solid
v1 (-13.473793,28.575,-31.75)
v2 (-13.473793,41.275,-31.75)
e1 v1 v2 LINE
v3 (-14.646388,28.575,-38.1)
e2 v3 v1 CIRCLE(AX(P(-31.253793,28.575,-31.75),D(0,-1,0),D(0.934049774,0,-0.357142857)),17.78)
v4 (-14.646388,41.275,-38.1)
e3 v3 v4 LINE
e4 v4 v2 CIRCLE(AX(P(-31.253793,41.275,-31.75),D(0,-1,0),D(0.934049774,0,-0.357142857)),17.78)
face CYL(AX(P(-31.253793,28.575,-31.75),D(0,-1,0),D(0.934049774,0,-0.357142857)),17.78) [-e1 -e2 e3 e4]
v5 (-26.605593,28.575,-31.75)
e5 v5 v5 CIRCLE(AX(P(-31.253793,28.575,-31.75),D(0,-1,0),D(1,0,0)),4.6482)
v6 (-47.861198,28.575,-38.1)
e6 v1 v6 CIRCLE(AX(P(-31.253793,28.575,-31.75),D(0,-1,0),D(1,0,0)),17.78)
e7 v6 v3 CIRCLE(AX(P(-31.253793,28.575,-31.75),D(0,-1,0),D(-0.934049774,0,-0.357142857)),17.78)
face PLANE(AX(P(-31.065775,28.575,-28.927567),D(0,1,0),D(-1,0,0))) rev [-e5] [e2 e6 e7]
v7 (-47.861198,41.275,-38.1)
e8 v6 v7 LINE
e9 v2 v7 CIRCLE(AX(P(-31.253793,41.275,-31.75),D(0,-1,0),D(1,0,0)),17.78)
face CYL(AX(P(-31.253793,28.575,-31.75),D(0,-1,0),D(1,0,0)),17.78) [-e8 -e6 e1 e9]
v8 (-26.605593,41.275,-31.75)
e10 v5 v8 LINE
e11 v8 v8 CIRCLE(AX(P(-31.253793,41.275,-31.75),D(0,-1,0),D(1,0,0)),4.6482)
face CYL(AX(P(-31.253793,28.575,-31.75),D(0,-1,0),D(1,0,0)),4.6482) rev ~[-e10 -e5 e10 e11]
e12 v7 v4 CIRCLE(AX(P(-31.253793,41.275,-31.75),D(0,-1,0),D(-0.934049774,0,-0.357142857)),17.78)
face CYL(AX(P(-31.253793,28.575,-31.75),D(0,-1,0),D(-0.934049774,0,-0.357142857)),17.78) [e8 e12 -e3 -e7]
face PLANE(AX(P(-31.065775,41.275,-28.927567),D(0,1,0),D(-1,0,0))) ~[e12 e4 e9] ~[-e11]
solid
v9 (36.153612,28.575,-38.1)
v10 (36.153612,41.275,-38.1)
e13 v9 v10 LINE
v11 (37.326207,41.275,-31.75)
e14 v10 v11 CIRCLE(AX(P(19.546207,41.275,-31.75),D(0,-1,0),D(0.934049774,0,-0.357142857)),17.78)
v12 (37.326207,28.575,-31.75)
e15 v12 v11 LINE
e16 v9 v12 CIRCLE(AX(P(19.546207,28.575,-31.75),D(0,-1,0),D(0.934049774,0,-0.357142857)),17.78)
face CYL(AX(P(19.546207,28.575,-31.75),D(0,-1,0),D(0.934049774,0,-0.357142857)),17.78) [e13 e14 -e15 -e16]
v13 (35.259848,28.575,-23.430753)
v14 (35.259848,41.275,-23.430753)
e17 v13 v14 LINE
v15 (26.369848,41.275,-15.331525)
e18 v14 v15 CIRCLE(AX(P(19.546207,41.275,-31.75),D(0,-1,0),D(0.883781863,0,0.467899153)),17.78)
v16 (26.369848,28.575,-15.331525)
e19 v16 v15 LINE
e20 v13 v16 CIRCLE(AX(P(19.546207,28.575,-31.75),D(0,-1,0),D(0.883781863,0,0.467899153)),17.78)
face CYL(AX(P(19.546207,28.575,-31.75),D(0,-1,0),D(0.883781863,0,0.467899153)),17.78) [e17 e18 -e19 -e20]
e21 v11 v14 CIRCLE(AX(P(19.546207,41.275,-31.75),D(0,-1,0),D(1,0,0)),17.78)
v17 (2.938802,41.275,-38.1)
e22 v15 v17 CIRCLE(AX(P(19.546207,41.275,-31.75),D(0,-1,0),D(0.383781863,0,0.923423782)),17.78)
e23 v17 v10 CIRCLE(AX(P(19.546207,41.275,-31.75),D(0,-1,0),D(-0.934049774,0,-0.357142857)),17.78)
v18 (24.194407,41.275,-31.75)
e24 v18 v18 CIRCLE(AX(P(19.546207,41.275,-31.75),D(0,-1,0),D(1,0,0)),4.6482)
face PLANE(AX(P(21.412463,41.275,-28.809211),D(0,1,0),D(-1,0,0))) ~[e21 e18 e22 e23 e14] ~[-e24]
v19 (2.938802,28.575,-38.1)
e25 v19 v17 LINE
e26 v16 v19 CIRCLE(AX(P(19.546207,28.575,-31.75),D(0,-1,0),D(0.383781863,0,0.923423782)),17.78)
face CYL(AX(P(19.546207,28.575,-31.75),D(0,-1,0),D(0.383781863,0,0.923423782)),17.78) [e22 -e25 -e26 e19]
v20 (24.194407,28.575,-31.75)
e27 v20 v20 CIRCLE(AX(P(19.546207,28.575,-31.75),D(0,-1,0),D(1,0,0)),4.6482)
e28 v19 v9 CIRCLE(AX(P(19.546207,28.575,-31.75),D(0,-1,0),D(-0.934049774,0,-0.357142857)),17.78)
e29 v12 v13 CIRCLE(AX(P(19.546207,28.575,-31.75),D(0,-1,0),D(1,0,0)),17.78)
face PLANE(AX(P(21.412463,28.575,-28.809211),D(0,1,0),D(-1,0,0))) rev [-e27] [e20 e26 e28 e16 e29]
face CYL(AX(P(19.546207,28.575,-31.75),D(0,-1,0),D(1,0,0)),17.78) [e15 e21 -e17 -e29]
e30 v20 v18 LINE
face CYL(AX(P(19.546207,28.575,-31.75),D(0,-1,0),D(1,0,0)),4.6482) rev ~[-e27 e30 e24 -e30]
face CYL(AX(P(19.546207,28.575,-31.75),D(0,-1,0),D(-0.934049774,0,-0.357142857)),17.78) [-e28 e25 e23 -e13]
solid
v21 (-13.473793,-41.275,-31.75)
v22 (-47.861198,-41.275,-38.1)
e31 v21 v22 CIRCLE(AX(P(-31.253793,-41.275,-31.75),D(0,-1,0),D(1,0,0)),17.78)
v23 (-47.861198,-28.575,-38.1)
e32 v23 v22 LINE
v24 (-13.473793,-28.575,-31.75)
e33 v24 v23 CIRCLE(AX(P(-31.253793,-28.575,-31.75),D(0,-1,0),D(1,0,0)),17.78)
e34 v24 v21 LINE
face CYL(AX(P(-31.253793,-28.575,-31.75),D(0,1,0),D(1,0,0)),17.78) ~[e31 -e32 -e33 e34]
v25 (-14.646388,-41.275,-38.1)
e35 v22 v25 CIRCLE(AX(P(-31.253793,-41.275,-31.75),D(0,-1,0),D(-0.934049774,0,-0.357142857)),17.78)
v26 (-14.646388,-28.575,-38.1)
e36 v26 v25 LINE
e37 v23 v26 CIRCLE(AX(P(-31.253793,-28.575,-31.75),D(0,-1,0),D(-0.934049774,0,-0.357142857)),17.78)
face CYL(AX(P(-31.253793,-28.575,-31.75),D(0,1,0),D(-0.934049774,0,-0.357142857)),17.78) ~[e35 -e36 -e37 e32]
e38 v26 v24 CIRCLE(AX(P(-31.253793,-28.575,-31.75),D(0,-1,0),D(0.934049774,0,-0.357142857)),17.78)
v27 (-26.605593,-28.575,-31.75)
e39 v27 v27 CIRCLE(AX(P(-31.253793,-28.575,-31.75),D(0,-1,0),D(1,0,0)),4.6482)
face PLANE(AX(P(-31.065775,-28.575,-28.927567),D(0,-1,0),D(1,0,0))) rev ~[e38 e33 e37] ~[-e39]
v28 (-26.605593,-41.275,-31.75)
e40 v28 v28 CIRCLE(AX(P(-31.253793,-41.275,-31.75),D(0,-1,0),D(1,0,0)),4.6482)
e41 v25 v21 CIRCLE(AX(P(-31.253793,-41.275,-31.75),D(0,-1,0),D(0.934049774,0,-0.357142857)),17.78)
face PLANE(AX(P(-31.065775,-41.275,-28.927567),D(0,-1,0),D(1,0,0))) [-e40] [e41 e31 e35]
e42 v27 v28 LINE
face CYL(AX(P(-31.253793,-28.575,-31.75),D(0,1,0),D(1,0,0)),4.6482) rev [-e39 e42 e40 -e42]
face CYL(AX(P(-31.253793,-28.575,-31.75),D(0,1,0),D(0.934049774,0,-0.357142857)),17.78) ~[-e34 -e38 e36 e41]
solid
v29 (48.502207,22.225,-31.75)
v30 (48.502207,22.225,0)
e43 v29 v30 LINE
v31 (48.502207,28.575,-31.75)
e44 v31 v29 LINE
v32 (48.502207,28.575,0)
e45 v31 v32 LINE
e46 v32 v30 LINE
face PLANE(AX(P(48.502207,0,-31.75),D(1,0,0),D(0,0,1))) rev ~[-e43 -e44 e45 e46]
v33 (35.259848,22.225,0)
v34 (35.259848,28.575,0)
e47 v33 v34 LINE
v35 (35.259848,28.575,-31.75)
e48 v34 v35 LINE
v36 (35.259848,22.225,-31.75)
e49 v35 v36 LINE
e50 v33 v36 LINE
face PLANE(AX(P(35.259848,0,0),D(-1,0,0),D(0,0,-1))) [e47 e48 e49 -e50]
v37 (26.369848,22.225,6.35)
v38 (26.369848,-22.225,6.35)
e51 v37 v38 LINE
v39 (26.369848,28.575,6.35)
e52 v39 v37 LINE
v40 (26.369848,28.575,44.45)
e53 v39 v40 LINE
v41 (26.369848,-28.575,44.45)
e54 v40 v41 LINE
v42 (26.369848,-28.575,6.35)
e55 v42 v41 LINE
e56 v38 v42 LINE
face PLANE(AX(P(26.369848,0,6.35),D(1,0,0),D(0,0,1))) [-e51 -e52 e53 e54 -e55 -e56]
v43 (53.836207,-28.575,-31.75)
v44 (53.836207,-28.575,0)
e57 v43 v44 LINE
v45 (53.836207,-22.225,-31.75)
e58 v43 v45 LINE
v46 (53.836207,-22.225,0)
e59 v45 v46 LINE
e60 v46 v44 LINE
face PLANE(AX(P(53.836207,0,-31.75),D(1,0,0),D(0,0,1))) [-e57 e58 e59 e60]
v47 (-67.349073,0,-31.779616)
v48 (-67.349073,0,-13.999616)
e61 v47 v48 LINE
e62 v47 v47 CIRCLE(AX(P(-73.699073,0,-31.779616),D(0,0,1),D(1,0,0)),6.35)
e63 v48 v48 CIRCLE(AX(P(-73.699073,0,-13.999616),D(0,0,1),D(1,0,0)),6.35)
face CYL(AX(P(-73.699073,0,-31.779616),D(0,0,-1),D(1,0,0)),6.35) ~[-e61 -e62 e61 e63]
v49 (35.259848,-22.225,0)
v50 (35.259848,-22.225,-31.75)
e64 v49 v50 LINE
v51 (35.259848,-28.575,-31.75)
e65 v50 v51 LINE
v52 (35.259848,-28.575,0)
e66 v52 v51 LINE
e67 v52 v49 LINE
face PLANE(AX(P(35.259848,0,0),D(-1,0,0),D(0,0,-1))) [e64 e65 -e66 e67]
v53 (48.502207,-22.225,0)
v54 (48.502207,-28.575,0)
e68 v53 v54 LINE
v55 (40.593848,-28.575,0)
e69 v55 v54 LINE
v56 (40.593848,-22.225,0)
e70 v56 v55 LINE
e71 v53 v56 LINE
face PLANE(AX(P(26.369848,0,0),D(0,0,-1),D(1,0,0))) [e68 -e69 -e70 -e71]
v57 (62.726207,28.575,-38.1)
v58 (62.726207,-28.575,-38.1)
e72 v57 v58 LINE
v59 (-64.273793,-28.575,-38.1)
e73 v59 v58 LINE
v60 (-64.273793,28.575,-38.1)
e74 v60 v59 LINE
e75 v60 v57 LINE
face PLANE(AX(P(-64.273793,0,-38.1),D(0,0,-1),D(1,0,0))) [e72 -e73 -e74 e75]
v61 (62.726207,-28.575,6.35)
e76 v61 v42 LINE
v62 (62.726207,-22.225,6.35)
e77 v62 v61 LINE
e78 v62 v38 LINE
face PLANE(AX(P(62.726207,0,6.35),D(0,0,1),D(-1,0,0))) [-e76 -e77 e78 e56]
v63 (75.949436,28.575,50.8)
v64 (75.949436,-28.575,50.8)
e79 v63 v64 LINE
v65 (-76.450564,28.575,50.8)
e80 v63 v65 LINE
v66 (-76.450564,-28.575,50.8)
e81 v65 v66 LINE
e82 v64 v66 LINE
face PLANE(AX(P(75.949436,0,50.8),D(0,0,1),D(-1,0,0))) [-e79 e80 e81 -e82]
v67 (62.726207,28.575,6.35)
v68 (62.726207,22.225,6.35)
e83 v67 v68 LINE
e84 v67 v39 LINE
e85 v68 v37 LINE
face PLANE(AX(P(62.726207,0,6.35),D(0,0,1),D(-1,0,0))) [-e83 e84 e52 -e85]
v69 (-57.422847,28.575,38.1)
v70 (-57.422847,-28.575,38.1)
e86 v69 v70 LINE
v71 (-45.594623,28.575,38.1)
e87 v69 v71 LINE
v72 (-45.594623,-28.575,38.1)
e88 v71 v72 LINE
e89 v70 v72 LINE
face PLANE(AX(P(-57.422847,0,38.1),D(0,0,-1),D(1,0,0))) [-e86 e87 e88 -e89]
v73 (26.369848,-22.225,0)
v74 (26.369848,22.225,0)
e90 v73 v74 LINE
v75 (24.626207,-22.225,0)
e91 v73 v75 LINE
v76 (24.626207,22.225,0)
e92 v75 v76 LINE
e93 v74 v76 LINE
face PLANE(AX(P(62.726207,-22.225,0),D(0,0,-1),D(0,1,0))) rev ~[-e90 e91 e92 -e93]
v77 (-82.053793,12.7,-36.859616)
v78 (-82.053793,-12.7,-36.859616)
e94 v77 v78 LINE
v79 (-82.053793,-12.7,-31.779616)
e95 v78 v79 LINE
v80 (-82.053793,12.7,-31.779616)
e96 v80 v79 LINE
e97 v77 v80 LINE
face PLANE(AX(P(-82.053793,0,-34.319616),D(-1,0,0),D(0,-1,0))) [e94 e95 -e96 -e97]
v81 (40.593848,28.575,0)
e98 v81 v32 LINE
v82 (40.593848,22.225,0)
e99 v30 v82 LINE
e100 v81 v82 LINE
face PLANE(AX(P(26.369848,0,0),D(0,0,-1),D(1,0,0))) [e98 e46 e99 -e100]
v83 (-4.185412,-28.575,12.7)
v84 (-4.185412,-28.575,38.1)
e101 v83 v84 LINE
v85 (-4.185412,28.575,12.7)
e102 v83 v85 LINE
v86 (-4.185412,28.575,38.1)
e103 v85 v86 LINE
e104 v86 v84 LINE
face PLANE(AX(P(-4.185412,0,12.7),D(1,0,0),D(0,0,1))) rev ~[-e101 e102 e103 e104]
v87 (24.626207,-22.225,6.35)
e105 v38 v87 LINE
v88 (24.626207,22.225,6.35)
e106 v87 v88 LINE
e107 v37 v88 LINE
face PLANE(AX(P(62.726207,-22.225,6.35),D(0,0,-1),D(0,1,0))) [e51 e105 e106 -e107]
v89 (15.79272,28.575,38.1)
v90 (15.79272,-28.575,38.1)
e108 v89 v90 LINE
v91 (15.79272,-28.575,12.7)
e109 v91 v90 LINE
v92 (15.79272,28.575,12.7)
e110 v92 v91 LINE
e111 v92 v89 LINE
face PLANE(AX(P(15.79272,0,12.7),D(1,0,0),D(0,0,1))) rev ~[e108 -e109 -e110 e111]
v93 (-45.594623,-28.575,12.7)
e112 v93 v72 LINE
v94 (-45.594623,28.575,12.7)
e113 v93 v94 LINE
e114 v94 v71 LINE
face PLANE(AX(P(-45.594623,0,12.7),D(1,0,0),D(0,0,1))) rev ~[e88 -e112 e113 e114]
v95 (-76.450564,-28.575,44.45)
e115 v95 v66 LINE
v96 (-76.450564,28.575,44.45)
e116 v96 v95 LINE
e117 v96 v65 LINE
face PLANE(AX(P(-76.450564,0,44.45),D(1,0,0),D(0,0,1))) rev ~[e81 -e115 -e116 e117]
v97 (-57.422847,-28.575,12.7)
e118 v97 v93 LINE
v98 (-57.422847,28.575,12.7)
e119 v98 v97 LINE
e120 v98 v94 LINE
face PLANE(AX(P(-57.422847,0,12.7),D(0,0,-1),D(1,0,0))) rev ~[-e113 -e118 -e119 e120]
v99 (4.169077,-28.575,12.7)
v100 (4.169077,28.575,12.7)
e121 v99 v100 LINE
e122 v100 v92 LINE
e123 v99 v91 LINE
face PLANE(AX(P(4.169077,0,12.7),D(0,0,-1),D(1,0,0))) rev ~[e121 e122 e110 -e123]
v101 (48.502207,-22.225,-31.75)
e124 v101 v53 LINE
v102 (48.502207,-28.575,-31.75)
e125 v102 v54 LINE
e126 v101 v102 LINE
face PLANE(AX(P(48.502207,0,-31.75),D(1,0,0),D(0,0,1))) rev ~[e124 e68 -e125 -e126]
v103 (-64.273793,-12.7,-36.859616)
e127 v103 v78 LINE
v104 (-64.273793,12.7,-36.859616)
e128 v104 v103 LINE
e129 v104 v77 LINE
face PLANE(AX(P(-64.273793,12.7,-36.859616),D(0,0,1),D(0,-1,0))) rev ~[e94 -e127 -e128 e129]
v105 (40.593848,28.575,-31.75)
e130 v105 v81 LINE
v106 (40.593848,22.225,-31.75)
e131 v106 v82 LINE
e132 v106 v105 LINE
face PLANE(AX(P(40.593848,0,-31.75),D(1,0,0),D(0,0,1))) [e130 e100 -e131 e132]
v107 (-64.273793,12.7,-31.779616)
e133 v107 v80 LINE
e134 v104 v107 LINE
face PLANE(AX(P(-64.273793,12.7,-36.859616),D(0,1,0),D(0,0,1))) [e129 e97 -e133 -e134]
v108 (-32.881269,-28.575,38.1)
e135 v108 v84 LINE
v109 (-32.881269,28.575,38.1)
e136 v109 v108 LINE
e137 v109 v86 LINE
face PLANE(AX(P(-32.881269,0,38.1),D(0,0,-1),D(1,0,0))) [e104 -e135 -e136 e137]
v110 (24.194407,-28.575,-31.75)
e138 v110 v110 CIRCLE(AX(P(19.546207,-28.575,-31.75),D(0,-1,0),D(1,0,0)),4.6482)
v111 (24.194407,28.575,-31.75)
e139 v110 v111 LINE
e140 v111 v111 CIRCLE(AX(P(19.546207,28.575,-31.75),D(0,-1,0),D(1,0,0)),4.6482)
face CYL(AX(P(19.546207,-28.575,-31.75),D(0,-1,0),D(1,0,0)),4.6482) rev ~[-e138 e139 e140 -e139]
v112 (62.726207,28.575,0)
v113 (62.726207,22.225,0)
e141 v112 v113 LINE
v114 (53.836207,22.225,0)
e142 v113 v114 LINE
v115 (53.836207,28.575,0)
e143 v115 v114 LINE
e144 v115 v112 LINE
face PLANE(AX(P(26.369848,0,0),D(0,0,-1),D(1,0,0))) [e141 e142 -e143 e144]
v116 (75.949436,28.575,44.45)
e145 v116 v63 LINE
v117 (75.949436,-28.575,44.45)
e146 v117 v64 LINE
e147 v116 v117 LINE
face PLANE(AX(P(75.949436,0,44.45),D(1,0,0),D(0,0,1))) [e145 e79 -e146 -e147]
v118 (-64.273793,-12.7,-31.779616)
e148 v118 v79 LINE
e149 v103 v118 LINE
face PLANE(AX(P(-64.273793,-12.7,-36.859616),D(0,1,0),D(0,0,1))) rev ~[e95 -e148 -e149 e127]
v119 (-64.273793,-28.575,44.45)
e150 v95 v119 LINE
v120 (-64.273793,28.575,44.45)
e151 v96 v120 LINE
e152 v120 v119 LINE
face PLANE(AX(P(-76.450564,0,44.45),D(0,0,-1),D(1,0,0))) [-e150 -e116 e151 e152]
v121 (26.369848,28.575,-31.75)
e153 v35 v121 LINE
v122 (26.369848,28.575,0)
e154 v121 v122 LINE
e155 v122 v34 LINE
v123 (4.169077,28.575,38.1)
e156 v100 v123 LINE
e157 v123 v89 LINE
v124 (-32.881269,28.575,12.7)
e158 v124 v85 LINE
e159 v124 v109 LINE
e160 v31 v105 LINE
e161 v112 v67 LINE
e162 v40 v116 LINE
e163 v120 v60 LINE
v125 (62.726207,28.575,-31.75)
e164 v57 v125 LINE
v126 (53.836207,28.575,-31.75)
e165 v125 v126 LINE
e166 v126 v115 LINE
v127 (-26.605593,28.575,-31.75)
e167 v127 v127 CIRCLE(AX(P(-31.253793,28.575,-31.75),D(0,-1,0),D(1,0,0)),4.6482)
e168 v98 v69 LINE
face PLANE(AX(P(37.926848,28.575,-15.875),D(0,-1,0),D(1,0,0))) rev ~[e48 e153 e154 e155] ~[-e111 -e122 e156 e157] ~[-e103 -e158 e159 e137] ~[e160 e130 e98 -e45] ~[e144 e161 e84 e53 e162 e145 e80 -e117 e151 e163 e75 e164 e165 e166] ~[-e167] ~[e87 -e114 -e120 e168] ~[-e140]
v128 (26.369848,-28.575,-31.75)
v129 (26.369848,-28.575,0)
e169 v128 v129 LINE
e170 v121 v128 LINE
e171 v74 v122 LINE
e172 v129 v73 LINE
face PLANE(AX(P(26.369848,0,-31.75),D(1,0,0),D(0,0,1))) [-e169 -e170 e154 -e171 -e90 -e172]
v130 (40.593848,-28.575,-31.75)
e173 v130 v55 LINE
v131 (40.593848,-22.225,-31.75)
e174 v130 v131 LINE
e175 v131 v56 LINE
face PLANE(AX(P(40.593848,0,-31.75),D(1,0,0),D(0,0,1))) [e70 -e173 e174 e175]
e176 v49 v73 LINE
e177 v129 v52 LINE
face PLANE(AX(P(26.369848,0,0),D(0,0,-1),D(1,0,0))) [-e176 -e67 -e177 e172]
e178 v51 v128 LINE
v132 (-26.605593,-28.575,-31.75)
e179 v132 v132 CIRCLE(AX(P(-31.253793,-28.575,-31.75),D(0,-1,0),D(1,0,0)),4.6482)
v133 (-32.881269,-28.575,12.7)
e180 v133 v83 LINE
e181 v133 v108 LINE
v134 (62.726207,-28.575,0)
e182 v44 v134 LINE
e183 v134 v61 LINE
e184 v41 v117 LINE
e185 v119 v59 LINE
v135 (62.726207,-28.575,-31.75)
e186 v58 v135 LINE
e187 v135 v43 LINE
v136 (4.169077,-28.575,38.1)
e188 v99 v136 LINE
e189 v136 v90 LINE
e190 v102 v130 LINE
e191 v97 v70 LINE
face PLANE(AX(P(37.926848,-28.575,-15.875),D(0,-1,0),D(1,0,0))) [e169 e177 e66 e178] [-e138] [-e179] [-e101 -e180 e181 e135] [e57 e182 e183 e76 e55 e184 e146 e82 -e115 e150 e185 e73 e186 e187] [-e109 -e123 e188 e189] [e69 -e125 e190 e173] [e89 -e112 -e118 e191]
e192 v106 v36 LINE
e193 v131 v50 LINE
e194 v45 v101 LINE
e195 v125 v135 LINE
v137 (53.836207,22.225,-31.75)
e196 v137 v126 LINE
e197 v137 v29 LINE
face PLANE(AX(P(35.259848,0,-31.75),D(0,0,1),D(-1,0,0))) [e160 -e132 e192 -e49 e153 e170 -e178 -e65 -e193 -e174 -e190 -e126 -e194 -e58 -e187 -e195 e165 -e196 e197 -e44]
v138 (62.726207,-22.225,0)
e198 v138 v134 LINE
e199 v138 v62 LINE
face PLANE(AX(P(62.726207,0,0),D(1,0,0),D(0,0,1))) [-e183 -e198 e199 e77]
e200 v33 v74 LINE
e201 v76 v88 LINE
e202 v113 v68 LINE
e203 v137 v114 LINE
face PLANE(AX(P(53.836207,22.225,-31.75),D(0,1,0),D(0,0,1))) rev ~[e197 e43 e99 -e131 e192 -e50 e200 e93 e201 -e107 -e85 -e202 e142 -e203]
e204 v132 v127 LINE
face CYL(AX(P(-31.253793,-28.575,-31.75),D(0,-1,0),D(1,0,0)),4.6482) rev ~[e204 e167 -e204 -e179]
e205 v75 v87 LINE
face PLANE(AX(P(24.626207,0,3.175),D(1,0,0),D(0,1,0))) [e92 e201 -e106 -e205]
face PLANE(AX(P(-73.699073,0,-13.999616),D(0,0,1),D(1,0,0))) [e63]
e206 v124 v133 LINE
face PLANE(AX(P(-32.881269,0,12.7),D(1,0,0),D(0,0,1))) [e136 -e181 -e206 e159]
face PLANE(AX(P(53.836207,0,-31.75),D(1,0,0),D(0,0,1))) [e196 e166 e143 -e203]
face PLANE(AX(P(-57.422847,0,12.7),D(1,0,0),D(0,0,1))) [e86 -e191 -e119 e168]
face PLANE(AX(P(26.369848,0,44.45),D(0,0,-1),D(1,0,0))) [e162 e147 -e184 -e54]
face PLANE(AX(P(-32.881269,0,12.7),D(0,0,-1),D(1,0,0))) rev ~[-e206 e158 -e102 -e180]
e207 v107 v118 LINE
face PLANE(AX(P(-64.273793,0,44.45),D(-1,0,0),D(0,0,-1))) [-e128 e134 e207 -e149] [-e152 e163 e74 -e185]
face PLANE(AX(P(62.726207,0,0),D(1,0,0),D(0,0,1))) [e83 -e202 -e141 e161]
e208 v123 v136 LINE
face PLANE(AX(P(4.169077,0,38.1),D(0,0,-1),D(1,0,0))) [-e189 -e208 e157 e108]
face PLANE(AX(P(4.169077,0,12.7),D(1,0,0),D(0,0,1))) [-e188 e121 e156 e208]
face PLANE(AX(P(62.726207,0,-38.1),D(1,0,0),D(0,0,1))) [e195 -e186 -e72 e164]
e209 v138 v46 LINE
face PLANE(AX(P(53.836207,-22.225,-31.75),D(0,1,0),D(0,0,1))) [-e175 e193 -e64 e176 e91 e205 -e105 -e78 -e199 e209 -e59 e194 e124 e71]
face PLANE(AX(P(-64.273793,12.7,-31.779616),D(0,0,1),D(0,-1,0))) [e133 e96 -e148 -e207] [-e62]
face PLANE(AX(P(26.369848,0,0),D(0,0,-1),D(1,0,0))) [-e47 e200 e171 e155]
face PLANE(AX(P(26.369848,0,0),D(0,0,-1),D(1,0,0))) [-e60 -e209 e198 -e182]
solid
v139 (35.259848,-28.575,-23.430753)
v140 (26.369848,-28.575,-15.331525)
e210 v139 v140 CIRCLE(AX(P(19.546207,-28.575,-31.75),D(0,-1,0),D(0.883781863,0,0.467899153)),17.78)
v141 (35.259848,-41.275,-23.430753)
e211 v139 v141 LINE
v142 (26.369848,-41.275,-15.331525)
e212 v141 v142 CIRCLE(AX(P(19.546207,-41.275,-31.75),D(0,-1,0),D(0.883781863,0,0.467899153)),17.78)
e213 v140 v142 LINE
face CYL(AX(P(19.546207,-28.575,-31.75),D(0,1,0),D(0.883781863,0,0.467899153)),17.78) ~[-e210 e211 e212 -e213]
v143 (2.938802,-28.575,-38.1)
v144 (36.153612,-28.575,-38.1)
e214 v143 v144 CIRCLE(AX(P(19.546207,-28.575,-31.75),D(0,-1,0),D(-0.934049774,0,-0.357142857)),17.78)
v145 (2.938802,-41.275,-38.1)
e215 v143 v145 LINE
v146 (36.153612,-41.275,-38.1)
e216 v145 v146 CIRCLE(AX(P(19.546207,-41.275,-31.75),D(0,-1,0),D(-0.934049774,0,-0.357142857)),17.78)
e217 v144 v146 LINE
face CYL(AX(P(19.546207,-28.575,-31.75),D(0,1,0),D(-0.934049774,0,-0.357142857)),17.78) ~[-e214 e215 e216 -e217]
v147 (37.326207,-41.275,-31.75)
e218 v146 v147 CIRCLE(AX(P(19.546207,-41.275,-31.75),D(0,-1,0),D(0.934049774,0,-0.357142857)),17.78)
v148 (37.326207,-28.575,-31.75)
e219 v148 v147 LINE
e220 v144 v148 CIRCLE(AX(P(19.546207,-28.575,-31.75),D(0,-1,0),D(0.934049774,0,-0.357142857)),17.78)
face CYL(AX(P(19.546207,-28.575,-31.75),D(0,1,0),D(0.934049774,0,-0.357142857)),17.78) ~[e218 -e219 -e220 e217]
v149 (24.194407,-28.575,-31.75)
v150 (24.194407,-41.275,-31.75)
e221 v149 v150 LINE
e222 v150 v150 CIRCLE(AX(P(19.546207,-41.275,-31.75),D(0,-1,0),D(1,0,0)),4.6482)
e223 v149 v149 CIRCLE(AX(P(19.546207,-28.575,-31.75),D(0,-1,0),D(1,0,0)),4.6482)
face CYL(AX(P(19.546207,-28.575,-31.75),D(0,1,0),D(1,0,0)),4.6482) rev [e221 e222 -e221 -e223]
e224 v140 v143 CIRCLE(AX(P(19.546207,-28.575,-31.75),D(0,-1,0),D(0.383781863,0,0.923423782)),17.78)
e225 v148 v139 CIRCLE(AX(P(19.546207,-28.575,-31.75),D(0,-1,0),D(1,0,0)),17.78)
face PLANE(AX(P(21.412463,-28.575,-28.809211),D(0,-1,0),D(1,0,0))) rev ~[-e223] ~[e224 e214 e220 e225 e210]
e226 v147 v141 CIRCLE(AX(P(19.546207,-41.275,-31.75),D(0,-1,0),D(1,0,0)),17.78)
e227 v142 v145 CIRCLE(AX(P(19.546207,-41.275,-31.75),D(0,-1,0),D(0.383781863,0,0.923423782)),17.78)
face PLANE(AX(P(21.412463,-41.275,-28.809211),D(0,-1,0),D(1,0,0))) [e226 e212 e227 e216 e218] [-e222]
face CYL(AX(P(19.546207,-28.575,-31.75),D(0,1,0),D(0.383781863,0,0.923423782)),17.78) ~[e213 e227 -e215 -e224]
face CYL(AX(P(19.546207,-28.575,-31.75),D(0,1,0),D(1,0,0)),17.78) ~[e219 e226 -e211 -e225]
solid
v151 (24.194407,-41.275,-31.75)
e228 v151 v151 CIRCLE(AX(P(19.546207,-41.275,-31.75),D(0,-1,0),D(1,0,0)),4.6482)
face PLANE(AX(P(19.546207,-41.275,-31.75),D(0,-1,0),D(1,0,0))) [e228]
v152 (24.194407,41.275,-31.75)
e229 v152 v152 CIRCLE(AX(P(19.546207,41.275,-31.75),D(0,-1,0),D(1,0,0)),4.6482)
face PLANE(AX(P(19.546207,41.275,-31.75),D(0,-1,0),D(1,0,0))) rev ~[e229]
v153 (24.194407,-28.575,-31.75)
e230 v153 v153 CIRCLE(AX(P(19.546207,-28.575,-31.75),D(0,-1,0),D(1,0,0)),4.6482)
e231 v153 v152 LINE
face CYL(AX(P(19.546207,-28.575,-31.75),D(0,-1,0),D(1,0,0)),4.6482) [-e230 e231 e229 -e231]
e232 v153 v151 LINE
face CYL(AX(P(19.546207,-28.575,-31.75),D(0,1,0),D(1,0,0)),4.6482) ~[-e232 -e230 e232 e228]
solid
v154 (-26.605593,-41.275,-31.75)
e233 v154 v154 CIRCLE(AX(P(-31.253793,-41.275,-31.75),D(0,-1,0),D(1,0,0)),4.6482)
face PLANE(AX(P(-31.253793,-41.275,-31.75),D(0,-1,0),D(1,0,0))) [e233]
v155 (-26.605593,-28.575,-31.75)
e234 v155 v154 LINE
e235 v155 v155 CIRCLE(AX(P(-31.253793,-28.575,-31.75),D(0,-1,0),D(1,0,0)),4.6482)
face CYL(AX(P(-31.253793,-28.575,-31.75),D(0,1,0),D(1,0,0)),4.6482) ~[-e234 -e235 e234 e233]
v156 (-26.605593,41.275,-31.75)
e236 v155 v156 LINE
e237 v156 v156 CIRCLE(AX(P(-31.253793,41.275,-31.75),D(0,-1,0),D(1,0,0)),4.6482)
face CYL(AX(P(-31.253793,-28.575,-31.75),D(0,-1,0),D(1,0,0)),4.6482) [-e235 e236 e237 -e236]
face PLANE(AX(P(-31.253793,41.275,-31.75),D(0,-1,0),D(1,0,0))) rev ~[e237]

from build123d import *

# Parameters (mm, degrees)
F0_W           = 5.334
F0_H           = 31.75
F0_W_2         = 12.1767708808
F0_H_2         = 6.35
F0_W_3         = 13.2232291192
F0_W_4         = 11.8282231389
F0_H_3         = 25.4
F0_W_5         = 28.695857618
F0_W_6         = 11.6236433387
F1_DEPTH       = 28.575
F2_W           = 44.45
F2_H           = 31.75
F3_DEPTH       = 25.4
F4_W           = 44.45
F4_H           = 6.35
F5_DEPTH       = 38.1
F6_R           = 4.6482
F7_DEPTH       = 12.7
F9_DEPTH       = 12.7
F9_DEPTH_BACK  = 70.104
F10_W          = 25.4
F10_H          = 5.08
F11_DEPTH      = 17.78
F12_R          = 6.35
F13_DEPTH      = 17.78
F14_DEPTH      = 69.85
F14_DEPTH_BACK = 12.7


# Not quite as in the source:
# - a feature names something its author has since deleted; it is built from what else it names


with BuildPart() as f1:
    # F0 (on Front) → F1 (new body, symmetric)
    with BuildSketch(Plane.XZ):
        Polygon((40.5938484461, 0), (35.2598484461, 0), (35.2598484461, -20.7330111994), (35.2598484461, -31.75), (40.5938484461, -31.75), (40.5938484461, -22.8515356839), align=None)
        with Locations((51.1692069136, -15.875)):
            Rectangle(F0_W, F0_H)
        with Locations((-70.3621785268, 47.625)):
            Rectangle(F0_W_2, F0_H_2)
        with Locations((69.3378214732, 47.625)):
            Rectangle(F0_W_3, F0_H_2)
        Polygon((62.7262069136, 50.8), (-64.2737930864, 50.8), (-64.2737930864, 44.45), (26.3698484461, 44.45), (62.7262069136, 44.45), align=None)
        Polygon((26.3698484461, 44.45), (-64.2737930864, 44.45), (-64.2737930864, -38.1), (-47.8611980613, -38.1), (-14.6463881115, -38.1), (13.0988019387, -38.1), (26.3698484461, -38.1), (26.3698484461, -31.75), (26.3698484461, -14.7111620115), (26.3698484461, 0), (26.3698484461, 6.35), align=None)
        with Locations((-51.5087349863, 25.4)):
            Rectangle(F0_W_4, F0_H_3, mode=Mode.SUBTRACT)
        with Locations((-18.5333405269, 25.4)):
            Rectangle(F0_W_5, F0_H_3, mode=Mode.SUBTRACT)
        with Locations((9.980898246, 25.4)):
            Rectangle(F0_W_6, F0_H_3, mode=Mode.SUBTRACT)
        Polygon((62.7262069136, 0), (62.7262069136, 6.35), (26.3698484461, 6.35), (26.3698484461, 0), (35.2598484461, 0), (40.5938484461, 0), (48.5022069136, 0), (53.8362069136, 0), align=None)
        Polygon((62.7262069136, -38.1), (62.7262069136, -31.75), (53.8362069136, -31.75), (48.5022069136, -31.75), (47.4862069136, -31.75), (40.5938484461, -31.75), (35.2598484461, -31.75), (26.3698484461, -31.75), (26.3698484461, -38.1), (46.3136118885, -38.1), align=None)
    extrude(amount=F1_DEPTH, both=True)

    # F2 (on face) → F3 (cut)
    with BuildSketch(Plane.YZ.offset(53.8362069136)):
        with Locations((0, -15.875)):
            Rectangle(F2_W, F2_H)
    extrude(amount=-F3_DEPTH, mode=Mode.SUBTRACT)

    # F4 (on face) → F5 (cut)
    with BuildSketch(Plane.YZ.offset(62.7262069136)):
        with Locations((0, 3.175)):
            Rectangle(F4_W, F4_H)
    extrude(amount=-F5_DEPTH, mode=Mode.SUBTRACT)

    # F6 (on face) → F9 (cut, two sides)
    with BuildSketch(Plane.XZ.offset(28.575)) as f9_sk:
        with Locations((19.5462069136, -31.75)):
            Circle(F6_R)
        with Locations((-31.2537930864, -31.75)):
            Circle(F6_R)
    extrude(amount=F9_DEPTH, mode=Mode.SUBTRACT)
    extrude(f9_sk.sketch, amount=-F9_DEPTH_BACK, mode=Mode.SUBTRACT)

    # F10 (on face) → F11 (join)
    with BuildSketch(Plane(origin=(-64.2737930864, 0, 0), x_dir=(0, -1, 0), z_dir=(-1, 0, 0))):
        with Locations((0, -34.3196164)):
            Rectangle(F10_W, F10_H)
    extrude(amount=F11_DEPTH)

    # F12 (on face) → F13 (join)
    with BuildSketch(Plane.XY.offset(-31.7796164)):
        with Locations((-73.6990726864, 0)):
            Circle(F12_R)
    extrude(amount=F13_DEPTH)


with BuildPart() as f7:
    # F6 (on face) → F7 (new body)
    with BuildSketch(Plane.XZ.offset(28.575)):
        with BuildLine():
            ThreePointArc((36.1536118885, -38.1), (37.0306008186, -34.9786792614), (37.3262069136, -31.75))
            ThreePointArc((37.3262069136, -31.75), (36.8018863619, -27.4639847439), (35.2598484461, -23.4307530517))
            Line((35.2598484461, -23.4307530517), (35.2598484461, -31.75))
            Line((35.2598484461, -31.75), (26.3698484461, -31.75))
            Line((26.3698484461, -31.75), (26.3698484461, -15.331525155))
            ThreePointArc((26.3698484461, -15.331525155), (7.1554293566, -18.9986458941), (2.9388019387, -38.1))
            Line((2.9388019387, -38.1), (36.1536118885, -38.1))
        make_face()
        with Locations((19.5462069136, -31.75)):
            Circle(F6_R, mode=Mode.SUBTRACT)
        with BuildLine():
            Line((35.2598484461, -31.75), (35.2598484461, -23.4307530517))
            ThreePointArc((35.2598484461, -23.4307530517), (31.5204148256, -18.6066844031), (26.3698484461, -15.331525155))
            Line((26.3698484461, -15.331525155), (26.3698484461, -31.75))
            Line((26.3698484461, -31.75), (35.2598484461, -31.75))
        make_face()
        with BuildLine():
            ThreePointArc((2.9388019387, -38.1), (19.5462069136, -49.53), (36.1536118885, -38.1))
            Line((36.1536118885, -38.1), (2.9388019387, -38.1))
        make_face()
    extrude(amount=F7_DEPTH)


with BuildPart() as f7b:
    # F6 (on face) → F7, piece 2 (new body)
    with BuildSketch(Plane.XZ.offset(28.575)):
        with BuildLine():
            Line((-47.8611980613, -38.1), (-14.6463881115, -38.1))
            ThreePointArc((-14.6463881115, -38.1), (-13.7693991814, -34.9786792614), (-13.4737930864, -31.75))
            ThreePointArc((-13.4737930864, -31.75), (-34.4824723478, -14.265606095), (-47.8611980613, -38.1))
        make_face()
        with Locations((-31.2537930864, -31.75)):
            Circle(F6_R, mode=Mode.SUBTRACT)
        with BuildLine():
            ThreePointArc((-47.8611980613, -38.1), (-31.2537930864, -49.53), (-14.6463881115, -38.1))
            Line((-14.6463881115, -38.1), (-47.8611980613, -38.1))
        make_face()
    extrude(amount=F7_DEPTH)


with BuildPart() as f8_1:
    # F8: instance of F7
    add(f7.part.mirror(Plane.XZ))


with BuildPart() as f8_2:
    # F8: instance of F7b
    add(f7b.part.mirror(Plane.XZ))


with BuildPart() as f14:
    # F6 (on face) → F14 (new body, two sides)
    with BuildSketch(Plane.XZ.offset(28.575)) as f14_sk:
        with Locations((-31.2537930864, -31.75)):
            Circle(F6_R)
    extrude(amount=-F14_DEPTH)
    extrude(f14_sk.sketch, amount=F14_DEPTH_BACK)


with BuildPart() as f14b:
    # F6 (on face) → F14, piece 2 (new body, two sides)
    with BuildSketch(Plane.XZ.offset(28.575)) as f14_2_sk:
        with Locations((19.5462069136, -31.75)):
            Circle(F6_R)
    extrude(amount=-F14_DEPTH)
    extrude(f14_2_sk.sketch, amount=F14_DEPTH_BACK)


solid = Compound([f1.part, f7.part, f7b.part, f8_1.part, f8_2.part, f14.part, f14b.part])
